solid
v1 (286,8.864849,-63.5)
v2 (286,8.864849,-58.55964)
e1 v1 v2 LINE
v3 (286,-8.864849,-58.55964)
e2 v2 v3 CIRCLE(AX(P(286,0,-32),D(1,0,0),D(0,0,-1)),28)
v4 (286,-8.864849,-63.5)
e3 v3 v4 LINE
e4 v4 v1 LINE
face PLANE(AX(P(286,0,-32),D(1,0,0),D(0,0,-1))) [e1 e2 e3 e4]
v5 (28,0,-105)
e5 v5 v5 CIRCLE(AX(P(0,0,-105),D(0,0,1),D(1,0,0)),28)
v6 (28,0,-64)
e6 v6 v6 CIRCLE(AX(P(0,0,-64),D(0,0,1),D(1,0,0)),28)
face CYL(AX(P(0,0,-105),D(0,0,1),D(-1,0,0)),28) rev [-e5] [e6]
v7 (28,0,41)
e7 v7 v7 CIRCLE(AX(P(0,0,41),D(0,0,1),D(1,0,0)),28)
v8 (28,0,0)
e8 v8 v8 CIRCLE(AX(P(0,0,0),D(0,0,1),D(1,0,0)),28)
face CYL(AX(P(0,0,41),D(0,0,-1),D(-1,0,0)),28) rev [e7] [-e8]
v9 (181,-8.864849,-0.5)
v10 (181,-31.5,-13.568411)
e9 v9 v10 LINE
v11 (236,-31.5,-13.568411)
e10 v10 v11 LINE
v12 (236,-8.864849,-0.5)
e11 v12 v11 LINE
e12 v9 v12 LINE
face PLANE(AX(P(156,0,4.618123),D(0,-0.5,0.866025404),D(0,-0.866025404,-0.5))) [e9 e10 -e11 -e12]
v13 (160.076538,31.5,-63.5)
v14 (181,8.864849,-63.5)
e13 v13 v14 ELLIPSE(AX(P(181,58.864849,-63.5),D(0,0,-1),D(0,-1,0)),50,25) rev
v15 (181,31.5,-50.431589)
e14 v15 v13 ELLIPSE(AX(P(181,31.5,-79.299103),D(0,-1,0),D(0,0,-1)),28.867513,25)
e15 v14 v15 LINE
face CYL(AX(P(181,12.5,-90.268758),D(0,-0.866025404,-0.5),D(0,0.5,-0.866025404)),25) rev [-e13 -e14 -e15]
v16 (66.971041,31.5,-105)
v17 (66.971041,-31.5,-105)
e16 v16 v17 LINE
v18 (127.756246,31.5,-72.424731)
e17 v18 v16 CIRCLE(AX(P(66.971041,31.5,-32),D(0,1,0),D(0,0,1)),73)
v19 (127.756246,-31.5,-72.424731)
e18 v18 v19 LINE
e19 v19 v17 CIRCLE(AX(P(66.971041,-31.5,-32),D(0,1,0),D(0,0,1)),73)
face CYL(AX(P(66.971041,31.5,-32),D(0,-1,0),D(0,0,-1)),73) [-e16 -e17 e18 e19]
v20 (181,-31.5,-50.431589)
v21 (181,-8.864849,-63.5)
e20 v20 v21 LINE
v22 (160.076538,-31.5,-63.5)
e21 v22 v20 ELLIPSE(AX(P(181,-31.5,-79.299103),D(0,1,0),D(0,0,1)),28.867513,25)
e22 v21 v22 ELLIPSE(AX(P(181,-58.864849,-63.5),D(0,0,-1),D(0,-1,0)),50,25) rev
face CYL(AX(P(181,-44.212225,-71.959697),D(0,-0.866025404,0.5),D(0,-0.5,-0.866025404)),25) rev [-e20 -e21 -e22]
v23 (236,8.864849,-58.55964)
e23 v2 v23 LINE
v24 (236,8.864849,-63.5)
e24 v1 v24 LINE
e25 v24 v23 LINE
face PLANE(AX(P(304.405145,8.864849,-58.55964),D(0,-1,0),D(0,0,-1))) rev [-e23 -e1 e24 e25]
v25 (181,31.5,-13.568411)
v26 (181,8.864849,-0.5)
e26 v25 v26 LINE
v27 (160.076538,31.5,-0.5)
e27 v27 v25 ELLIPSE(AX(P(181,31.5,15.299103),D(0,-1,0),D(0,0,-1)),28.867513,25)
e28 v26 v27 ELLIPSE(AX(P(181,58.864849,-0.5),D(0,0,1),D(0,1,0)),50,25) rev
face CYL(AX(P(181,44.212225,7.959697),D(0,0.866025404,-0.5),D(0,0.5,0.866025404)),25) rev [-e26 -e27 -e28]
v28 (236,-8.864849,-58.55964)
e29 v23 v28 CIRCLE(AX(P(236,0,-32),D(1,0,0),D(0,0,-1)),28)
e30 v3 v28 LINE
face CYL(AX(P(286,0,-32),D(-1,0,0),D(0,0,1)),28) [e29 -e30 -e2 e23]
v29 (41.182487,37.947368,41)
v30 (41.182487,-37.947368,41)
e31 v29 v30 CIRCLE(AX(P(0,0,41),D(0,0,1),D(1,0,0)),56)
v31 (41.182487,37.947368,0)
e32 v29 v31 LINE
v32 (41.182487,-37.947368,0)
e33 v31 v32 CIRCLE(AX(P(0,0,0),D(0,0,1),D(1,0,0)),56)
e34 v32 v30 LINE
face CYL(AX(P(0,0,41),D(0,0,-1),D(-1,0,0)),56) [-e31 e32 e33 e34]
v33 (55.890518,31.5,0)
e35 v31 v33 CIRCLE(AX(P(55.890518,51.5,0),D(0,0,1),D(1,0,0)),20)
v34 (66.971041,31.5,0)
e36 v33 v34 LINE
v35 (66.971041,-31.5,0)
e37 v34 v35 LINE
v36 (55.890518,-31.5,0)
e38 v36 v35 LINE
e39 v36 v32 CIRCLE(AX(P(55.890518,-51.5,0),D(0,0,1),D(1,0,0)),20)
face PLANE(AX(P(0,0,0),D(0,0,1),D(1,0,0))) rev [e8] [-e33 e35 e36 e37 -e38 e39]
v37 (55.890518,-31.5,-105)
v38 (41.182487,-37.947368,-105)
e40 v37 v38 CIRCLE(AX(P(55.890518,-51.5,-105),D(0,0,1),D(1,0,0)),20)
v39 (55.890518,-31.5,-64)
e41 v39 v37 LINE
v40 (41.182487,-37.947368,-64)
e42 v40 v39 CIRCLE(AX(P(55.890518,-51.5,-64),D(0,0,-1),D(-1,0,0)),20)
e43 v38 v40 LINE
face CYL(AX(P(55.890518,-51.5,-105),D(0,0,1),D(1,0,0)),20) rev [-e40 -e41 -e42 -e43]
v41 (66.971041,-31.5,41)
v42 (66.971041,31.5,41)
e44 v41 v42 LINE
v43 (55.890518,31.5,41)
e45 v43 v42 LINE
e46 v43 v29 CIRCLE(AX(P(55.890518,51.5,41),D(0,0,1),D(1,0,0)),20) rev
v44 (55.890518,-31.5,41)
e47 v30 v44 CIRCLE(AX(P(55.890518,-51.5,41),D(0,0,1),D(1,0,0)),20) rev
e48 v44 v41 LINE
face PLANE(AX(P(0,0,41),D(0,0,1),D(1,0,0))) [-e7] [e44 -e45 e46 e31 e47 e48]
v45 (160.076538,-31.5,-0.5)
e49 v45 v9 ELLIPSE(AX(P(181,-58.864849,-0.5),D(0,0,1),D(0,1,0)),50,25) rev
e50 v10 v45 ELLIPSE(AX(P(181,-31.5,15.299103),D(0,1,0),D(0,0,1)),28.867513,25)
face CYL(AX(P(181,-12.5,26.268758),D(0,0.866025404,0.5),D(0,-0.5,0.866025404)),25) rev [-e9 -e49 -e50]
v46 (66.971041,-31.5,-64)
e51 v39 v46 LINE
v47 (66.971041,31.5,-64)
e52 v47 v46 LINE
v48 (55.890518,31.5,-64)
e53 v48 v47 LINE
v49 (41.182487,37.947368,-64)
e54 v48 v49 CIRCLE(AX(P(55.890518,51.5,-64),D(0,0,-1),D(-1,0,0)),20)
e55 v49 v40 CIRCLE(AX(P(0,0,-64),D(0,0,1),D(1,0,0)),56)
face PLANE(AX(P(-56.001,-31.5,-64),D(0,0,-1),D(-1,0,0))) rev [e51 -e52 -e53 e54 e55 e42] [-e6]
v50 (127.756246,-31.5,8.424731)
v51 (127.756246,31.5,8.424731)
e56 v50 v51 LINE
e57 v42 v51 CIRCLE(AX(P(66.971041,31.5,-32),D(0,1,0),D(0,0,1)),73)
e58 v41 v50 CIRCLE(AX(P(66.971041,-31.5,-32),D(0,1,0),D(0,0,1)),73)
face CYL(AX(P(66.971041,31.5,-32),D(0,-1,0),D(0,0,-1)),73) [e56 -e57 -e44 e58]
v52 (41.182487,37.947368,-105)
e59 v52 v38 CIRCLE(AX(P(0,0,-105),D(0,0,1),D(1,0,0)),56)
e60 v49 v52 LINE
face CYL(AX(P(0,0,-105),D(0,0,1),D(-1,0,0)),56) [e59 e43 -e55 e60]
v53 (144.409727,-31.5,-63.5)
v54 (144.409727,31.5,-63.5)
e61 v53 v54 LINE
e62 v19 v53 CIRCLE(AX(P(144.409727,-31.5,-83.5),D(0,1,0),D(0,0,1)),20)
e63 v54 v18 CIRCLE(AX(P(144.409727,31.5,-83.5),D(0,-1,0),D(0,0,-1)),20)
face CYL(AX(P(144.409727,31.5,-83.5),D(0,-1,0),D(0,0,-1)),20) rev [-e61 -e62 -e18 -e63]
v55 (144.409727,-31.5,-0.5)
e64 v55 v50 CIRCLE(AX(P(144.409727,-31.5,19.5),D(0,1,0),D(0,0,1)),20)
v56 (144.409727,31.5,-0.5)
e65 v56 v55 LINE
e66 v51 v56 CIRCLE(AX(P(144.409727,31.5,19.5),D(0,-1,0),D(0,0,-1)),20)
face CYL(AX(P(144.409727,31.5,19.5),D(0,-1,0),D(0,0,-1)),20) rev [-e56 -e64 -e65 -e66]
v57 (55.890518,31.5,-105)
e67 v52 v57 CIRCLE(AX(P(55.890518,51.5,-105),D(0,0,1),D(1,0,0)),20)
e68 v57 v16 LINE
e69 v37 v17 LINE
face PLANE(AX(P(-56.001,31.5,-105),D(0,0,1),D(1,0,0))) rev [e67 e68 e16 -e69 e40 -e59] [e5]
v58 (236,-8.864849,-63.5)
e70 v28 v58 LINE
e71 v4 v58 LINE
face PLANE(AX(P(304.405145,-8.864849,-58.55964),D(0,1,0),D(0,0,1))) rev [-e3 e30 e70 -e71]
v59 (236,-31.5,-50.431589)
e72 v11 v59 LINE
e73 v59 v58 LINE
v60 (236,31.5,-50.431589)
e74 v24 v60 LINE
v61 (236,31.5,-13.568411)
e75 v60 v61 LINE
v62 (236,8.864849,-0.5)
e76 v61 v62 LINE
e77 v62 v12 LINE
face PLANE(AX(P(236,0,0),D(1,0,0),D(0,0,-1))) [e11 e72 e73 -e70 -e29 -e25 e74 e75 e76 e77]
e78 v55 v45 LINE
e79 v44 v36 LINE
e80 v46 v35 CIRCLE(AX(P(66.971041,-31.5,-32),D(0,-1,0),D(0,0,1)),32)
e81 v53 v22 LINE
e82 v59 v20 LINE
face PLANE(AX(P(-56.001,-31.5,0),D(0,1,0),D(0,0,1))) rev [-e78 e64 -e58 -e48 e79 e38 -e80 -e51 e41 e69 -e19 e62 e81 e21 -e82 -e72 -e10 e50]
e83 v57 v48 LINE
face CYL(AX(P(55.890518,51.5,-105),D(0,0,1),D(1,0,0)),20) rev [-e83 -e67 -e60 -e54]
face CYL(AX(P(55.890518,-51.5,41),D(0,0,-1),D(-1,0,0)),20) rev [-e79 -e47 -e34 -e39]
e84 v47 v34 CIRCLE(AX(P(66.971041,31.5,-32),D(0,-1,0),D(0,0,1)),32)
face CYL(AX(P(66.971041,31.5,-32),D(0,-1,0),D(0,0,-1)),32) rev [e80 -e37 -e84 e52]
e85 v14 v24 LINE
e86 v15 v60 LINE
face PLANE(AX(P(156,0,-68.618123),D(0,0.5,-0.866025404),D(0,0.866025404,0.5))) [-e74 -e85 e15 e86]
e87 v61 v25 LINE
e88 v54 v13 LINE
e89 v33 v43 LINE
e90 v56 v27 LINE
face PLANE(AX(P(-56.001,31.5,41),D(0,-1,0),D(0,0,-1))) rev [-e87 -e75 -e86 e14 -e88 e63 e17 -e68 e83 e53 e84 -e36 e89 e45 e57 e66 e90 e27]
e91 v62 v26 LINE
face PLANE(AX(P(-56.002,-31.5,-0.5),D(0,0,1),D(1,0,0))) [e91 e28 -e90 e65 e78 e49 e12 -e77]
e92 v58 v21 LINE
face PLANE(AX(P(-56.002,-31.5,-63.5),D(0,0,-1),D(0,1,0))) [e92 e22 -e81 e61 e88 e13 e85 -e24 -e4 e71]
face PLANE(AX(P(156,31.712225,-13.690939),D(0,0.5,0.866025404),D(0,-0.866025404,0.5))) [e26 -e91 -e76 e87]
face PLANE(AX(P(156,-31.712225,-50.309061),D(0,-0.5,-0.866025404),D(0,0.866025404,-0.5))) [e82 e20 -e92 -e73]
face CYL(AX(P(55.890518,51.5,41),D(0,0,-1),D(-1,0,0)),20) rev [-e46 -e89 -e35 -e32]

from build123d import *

# Parameters (mm, degrees)
SKETCH2_R                = 56
SKETCH2_R_2              = 28
BOSS_EXTRUDE1_DEPTH      = 41
BOSS_EXTRUDE2_DEPTH      = 31.5
BOSS_EXTRUDE3_REACH      = 173.122
BOSS_EXTRUDE3_END_RADIUS = 56
SKETCH4_W                = 41
SKETCH4_H                = 63
FILLET1_R                = 20
BOSS_EXTRUDE4_REACH      = 317.317
BOSS_EXTRUDE4_END_RADIUS = 73
SKETCH6_W                = 63
SKETCH6_H                = 63
FILLET2_R                = 20
SKETCH7_R                = 28
BOSS_EXTRUDE5_DEPTH      = 50
SKETCH8_R                = 50
CUT_EXTRUDE1_DEPTH       = 80
FILLET3_R                = 25
BOSS_EXTRUDE6_DEPTH      = 50


with BuildPart() as part:
    # Sketch2 → Boss-Extrude1 (new body)
    with BuildSketch(Plane.XY):
        Circle(SKETCH2_R)
        Circle(SKETCH2_R_2, mode=Mode.SUBTRACT)
    extrude(amount=BOSS_EXTRUDE1_DEPTH)


with BuildPart() as body_2:
    # Mirror4: mirrored copy
    add(part.part.mirror(Plane(origin=(0, 0, -32), x_dir=(1, 0, 0), z_dir=(0, 0, -1))))


with BuildPart() as body_3:
    # Sketch3 → Boss-Extrude2 (new, symmetric)
    with BuildSketch(Plane(origin=(0, 0, 0), x_dir=(1, 0, 0), z_dir=(0, 1, 0))):
        with BuildLine():
            Line((66.971041272, 105), (66.971041272, 64))
            ThreePointArc((66.971041272, 64), (98.971041272, 32), (66.971041272, 0))
            Line((66.971041272, 0), (66.971041272, -41))
            ThreePointArc((66.971041272, -41), (139.971041272, 32), (66.971041272, 105))
        make_face()
    extrude(amount=BOSS_EXTRUDE2_DEPTH, both=True)


with BuildPart() as part_1:
    add(part.part)

    add(body_2.part)  # Boss-Extrude3 merges body 2

    add(body_3.part)  # Boss-Extrude3 merges body 3
    # Boss-Extrude3: up to this cylinder (the profile starts outside it)
    boss_extrude3_end = Plane(origin=(0, 0, -32), z_dir=(0, 0, 1)) * Cylinder(BOSS_EXTRUDE3_END_RADIUS, 564.244, mode=Mode.PRIVATE)
    # Sketch4 → Boss-Extrude3 (add, up to the surface)
    with BuildSketch(Plane.ZY.offset(-66.971041272), mode=Mode.PRIVATE) as boss_extrude3_sk1:
        with Locations((20.5, 0)):
            Rectangle(SKETCH4_W, SKETCH4_H)
    boss_extrude3_tool1 = extrude(boss_extrude3_sk1.sketch, amount=BOSS_EXTRUDE3_REACH, mode=Mode.PRIVATE) - boss_extrude3_end
    add(boss_extrude3_tool1.solids().sort_by_distance((66.971041, 0, 20.5))[0])
    # Sketch4 → Boss-Extrude3 (add, up to the surface)
    with BuildSketch(Plane.ZY.offset(-66.971041272), mode=Mode.PRIVATE) as boss_extrude3_sk2:
        with Locations((-84.5, 0)):
            Rectangle(SKETCH4_W, SKETCH4_H)
    boss_extrude3_tool2 = extrude(boss_extrude3_sk2.sketch, amount=BOSS_EXTRUDE3_REACH, mode=Mode.PRIVATE) - boss_extrude3_end
    add(boss_extrude3_tool2.solids().sort_by_distance((66.971041, 0, -84.5))[0])

    # Fillet1
    fillet1_edges = [part_1.edges().sort_by_distance(p)[0] for p in [
        (46.300647944, 31.5, 20.5),
        (46.300647944, -31.5, 20.5),
        (46.300647944, -31.5, -84.5),
        (46.300647944, 31.5, -84.5),
    ]]
    fillet(fillet1_edges, radius=FILLET1_R)

    # Boss-Extrude4: up to this cylinder (the profile starts outside it)
    boss_extrude4_end = Plane(origin=(66.971041272, 0, -32), z_dir=(0, -1, 0)) * Cylinder(BOSS_EXTRUDE4_END_RADIUS, 781.634, mode=Mode.PRIVATE)
    # Sketch6 → Boss-Extrude4 (add, up to the surface)
    with BuildSketch(Plane(origin=(236, 0, 0), x_dir=(0, 0, -1), z_dir=(1, 0, 0)), mode=Mode.PRIVATE) as boss_extrude4_sk1:
        with Locations((32, 0)):
            Rectangle(SKETCH6_W, SKETCH6_H)
    boss_extrude4_tool1 = extrude(boss_extrude4_sk1.sketch, amount=-BOSS_EXTRUDE4_REACH, mode=Mode.PRIVATE) - boss_extrude4_end
    add(boss_extrude4_tool1.solids().sort_by_distance((236, 0, -32))[0])

    # Fillet2
    fillet2_edges = [part_1.edges().sort_by_distance(p)[0] for p in [
        (132.825046465, 0, -0.5),
        (132.825046465, 0, -63.5),
    ]]
    fillet(fillet2_edges, radius=FILLET2_R)

    # Sketch7 → Boss-Extrude5 (add)
    with BuildSketch(Plane(origin=(236, 0, 0), x_dir=(0, 0, -1), z_dir=(1, 0, 0))):
        with Locations((32, 0)):
            Circle(SKETCH7_R)
    extrude(amount=BOSS_EXTRUDE5_DEPTH)

    # Sketch8 → Cut-Extrude1 (cut)
    with BuildSketch(Plane(origin=(236, 0, 0), x_dir=(0, 0, -1), z_dir=(1, 0, 0))):
        with Locations((32, 0)):
            Circle(SKETCH8_R)
        Polygon((68.618122977, 0), (50.309061489, 31.712224737), (13.690938511, 31.712224737), (-4.618122977, 0), (13.690938511, -31.712224737), (50.309061489, -31.712224737), align=None, mode=Mode.SUBTRACT)
    extrude(amount=-CUT_EXTRUDE1_DEPTH, mode=Mode.SUBTRACT)

    # Fillet3
    # the kernel refuses this fillet: 25 mm, written as the material it adds along each edge
    with BuildSketch(Plane(origin=(156, -45.2617387, -94.75), x_dir=(0, 0.5000000000000009, -0.866025403784438), z_dir=(0, 0.8660254037844382, 0.500000000000001))) as fillet3_piece_1_section:
        with BuildLine():
            CenterArc((FILLET3_R, -FILLET3_R), FILLET3_R, 90, 90)
            Line((0, -FILLET3_R), (0, 0))
            Line((0, 0), (FILLET3_R, 0))
        make_face()
    fillet3_piece_1 = extrude(amount=151.136821004, mode=Mode.PRIVATE)
    fillet3_piece_1 = split(fillet3_piece_1, bisect_by=Plane(origin=(163.326286351, 23.024042198, -63.5), z_dir=(0, 0, 1)), keep=Keep.TOP, mode=Mode.PRIVATE)
    fillet3_piece_1 = split(fillet3_piece_1, bisect_by=Plane(origin=(163.326286351, 31.5, -58.606403481), z_dir=(0, -1, 0)), keep=Keep.TOP, mode=Mode.PRIVATE)
    add(fillet3_piece_1)
    with BuildSketch(Plane(origin=(156, -85.626587737, -19.181589498), x_dir=(0, -0.49999999999999484, -0.8660254037844416), z_dir=(0, 0.8660254037844417, -0.49999999999999484))) as fillet3_piece_2_section:
        with BuildLine():
            CenterArc((FILLET3_R, -FILLET3_R), FILLET3_R, 90, 90)
            Line((0, -FILLET3_R), (0, 0))
            Line((0, 0), (FILLET3_R, 0))
        make_face()
    fillet3_piece_2 = extrude(amount=151.136821004, mode=Mode.PRIVATE)
    fillet3_piece_2 = split(fillet3_piece_2, bisect_by=Plane(origin=(163.326286351, -31.5, -58.606403481), z_dir=(0, 1, 0)), keep=Keep.TOP, mode=Mode.PRIVATE)
    fillet3_piece_2 = split(fillet3_piece_2, bisect_by=Plane(origin=(163.326286351, -23.024042198, -63.5), z_dir=(0, 0, 1)), keep=Keep.TOP, mode=Mode.PRIVATE)
    add(fillet3_piece_2)
    with BuildSketch(Plane(origin=(156, 85.626587737, -44.818410502), x_dir=(1, 0, 0), z_dir=(0, -0.8660254037844416, 0.49999999999999506))) as fillet3_piece_3_section:
        with BuildLine():
            CenterArc((FILLET3_R, FILLET3_R), FILLET3_R, 180, 90)
            Line((0, FILLET3_R), (0, 0))
            Line((0, 0), (FILLET3_R, 0))
        make_face()
    fillet3_piece_3 = extrude(amount=151.136821004, mode=Mode.PRIVATE)
    fillet3_piece_3 = split(fillet3_piece_3, bisect_by=Plane(origin=(163.326286352, 23.024042197, -0.5), z_dir=(0, 0, -1)), keep=Keep.TOP, mode=Mode.PRIVATE)
    fillet3_piece_3 = split(fillet3_piece_3, bisect_by=Plane(origin=(163.326286352, 31.5, -5.393596519), z_dir=(0, -1, 0)), keep=Keep.TOP, mode=Mode.PRIVATE)
    add(fillet3_piece_3)
    with BuildSketch(Plane(origin=(156, 45.2617387, 30.75), x_dir=(1, 0, 0), z_dir=(0, -0.8660254037844346, -0.5000000000000071))) as fillet3_piece_4_section:
        with BuildLine():
            CenterArc((FILLET3_R, FILLET3_R), FILLET3_R, 180, 90)
            Line((0, FILLET3_R), (0, 0))
            Line((0, 0), (FILLET3_R, 0))
        make_face()
    fillet3_piece_4 = extrude(amount=151.136821004, mode=Mode.PRIVATE)
    fillet3_piece_4 = split(fillet3_piece_4, bisect_by=Plane(origin=(163.326286352, -31.5, -5.393596519), z_dir=(0, 1, 0)), keep=Keep.TOP, mode=Mode.PRIVATE)
    fillet3_piece_4 = split(fillet3_piece_4, bisect_by=Plane(origin=(163.326286352, -23.024042197, -0.5), z_dir=(0, 0, -1)), keep=Keep.TOP, mode=Mode.PRIVATE)
    add(fillet3_piece_4)

    # Sketch9 → Boss-Extrude6 (add)
    with BuildSketch(Plane(origin=(236, 0, 0), x_dir=(0, 0, -1), z_dir=(1, 0, 0))):
        with BuildLine():
            Line((58.559639523, 8.864849036), (63.5, 8.864849036))
            Line((63.5, 8.864849036), (63.5, -8.864849036))
            Line((63.5, -8.864849036), (58.559639523, -8.864849036))
            ThreePointArc((58.559639523, -8.864849036), (60, 0), (58.559639523, 8.864849036))
        make_face()
    extrude(amount=BOSS_EXTRUDE6_DEPTH)


solid = part_1.part
